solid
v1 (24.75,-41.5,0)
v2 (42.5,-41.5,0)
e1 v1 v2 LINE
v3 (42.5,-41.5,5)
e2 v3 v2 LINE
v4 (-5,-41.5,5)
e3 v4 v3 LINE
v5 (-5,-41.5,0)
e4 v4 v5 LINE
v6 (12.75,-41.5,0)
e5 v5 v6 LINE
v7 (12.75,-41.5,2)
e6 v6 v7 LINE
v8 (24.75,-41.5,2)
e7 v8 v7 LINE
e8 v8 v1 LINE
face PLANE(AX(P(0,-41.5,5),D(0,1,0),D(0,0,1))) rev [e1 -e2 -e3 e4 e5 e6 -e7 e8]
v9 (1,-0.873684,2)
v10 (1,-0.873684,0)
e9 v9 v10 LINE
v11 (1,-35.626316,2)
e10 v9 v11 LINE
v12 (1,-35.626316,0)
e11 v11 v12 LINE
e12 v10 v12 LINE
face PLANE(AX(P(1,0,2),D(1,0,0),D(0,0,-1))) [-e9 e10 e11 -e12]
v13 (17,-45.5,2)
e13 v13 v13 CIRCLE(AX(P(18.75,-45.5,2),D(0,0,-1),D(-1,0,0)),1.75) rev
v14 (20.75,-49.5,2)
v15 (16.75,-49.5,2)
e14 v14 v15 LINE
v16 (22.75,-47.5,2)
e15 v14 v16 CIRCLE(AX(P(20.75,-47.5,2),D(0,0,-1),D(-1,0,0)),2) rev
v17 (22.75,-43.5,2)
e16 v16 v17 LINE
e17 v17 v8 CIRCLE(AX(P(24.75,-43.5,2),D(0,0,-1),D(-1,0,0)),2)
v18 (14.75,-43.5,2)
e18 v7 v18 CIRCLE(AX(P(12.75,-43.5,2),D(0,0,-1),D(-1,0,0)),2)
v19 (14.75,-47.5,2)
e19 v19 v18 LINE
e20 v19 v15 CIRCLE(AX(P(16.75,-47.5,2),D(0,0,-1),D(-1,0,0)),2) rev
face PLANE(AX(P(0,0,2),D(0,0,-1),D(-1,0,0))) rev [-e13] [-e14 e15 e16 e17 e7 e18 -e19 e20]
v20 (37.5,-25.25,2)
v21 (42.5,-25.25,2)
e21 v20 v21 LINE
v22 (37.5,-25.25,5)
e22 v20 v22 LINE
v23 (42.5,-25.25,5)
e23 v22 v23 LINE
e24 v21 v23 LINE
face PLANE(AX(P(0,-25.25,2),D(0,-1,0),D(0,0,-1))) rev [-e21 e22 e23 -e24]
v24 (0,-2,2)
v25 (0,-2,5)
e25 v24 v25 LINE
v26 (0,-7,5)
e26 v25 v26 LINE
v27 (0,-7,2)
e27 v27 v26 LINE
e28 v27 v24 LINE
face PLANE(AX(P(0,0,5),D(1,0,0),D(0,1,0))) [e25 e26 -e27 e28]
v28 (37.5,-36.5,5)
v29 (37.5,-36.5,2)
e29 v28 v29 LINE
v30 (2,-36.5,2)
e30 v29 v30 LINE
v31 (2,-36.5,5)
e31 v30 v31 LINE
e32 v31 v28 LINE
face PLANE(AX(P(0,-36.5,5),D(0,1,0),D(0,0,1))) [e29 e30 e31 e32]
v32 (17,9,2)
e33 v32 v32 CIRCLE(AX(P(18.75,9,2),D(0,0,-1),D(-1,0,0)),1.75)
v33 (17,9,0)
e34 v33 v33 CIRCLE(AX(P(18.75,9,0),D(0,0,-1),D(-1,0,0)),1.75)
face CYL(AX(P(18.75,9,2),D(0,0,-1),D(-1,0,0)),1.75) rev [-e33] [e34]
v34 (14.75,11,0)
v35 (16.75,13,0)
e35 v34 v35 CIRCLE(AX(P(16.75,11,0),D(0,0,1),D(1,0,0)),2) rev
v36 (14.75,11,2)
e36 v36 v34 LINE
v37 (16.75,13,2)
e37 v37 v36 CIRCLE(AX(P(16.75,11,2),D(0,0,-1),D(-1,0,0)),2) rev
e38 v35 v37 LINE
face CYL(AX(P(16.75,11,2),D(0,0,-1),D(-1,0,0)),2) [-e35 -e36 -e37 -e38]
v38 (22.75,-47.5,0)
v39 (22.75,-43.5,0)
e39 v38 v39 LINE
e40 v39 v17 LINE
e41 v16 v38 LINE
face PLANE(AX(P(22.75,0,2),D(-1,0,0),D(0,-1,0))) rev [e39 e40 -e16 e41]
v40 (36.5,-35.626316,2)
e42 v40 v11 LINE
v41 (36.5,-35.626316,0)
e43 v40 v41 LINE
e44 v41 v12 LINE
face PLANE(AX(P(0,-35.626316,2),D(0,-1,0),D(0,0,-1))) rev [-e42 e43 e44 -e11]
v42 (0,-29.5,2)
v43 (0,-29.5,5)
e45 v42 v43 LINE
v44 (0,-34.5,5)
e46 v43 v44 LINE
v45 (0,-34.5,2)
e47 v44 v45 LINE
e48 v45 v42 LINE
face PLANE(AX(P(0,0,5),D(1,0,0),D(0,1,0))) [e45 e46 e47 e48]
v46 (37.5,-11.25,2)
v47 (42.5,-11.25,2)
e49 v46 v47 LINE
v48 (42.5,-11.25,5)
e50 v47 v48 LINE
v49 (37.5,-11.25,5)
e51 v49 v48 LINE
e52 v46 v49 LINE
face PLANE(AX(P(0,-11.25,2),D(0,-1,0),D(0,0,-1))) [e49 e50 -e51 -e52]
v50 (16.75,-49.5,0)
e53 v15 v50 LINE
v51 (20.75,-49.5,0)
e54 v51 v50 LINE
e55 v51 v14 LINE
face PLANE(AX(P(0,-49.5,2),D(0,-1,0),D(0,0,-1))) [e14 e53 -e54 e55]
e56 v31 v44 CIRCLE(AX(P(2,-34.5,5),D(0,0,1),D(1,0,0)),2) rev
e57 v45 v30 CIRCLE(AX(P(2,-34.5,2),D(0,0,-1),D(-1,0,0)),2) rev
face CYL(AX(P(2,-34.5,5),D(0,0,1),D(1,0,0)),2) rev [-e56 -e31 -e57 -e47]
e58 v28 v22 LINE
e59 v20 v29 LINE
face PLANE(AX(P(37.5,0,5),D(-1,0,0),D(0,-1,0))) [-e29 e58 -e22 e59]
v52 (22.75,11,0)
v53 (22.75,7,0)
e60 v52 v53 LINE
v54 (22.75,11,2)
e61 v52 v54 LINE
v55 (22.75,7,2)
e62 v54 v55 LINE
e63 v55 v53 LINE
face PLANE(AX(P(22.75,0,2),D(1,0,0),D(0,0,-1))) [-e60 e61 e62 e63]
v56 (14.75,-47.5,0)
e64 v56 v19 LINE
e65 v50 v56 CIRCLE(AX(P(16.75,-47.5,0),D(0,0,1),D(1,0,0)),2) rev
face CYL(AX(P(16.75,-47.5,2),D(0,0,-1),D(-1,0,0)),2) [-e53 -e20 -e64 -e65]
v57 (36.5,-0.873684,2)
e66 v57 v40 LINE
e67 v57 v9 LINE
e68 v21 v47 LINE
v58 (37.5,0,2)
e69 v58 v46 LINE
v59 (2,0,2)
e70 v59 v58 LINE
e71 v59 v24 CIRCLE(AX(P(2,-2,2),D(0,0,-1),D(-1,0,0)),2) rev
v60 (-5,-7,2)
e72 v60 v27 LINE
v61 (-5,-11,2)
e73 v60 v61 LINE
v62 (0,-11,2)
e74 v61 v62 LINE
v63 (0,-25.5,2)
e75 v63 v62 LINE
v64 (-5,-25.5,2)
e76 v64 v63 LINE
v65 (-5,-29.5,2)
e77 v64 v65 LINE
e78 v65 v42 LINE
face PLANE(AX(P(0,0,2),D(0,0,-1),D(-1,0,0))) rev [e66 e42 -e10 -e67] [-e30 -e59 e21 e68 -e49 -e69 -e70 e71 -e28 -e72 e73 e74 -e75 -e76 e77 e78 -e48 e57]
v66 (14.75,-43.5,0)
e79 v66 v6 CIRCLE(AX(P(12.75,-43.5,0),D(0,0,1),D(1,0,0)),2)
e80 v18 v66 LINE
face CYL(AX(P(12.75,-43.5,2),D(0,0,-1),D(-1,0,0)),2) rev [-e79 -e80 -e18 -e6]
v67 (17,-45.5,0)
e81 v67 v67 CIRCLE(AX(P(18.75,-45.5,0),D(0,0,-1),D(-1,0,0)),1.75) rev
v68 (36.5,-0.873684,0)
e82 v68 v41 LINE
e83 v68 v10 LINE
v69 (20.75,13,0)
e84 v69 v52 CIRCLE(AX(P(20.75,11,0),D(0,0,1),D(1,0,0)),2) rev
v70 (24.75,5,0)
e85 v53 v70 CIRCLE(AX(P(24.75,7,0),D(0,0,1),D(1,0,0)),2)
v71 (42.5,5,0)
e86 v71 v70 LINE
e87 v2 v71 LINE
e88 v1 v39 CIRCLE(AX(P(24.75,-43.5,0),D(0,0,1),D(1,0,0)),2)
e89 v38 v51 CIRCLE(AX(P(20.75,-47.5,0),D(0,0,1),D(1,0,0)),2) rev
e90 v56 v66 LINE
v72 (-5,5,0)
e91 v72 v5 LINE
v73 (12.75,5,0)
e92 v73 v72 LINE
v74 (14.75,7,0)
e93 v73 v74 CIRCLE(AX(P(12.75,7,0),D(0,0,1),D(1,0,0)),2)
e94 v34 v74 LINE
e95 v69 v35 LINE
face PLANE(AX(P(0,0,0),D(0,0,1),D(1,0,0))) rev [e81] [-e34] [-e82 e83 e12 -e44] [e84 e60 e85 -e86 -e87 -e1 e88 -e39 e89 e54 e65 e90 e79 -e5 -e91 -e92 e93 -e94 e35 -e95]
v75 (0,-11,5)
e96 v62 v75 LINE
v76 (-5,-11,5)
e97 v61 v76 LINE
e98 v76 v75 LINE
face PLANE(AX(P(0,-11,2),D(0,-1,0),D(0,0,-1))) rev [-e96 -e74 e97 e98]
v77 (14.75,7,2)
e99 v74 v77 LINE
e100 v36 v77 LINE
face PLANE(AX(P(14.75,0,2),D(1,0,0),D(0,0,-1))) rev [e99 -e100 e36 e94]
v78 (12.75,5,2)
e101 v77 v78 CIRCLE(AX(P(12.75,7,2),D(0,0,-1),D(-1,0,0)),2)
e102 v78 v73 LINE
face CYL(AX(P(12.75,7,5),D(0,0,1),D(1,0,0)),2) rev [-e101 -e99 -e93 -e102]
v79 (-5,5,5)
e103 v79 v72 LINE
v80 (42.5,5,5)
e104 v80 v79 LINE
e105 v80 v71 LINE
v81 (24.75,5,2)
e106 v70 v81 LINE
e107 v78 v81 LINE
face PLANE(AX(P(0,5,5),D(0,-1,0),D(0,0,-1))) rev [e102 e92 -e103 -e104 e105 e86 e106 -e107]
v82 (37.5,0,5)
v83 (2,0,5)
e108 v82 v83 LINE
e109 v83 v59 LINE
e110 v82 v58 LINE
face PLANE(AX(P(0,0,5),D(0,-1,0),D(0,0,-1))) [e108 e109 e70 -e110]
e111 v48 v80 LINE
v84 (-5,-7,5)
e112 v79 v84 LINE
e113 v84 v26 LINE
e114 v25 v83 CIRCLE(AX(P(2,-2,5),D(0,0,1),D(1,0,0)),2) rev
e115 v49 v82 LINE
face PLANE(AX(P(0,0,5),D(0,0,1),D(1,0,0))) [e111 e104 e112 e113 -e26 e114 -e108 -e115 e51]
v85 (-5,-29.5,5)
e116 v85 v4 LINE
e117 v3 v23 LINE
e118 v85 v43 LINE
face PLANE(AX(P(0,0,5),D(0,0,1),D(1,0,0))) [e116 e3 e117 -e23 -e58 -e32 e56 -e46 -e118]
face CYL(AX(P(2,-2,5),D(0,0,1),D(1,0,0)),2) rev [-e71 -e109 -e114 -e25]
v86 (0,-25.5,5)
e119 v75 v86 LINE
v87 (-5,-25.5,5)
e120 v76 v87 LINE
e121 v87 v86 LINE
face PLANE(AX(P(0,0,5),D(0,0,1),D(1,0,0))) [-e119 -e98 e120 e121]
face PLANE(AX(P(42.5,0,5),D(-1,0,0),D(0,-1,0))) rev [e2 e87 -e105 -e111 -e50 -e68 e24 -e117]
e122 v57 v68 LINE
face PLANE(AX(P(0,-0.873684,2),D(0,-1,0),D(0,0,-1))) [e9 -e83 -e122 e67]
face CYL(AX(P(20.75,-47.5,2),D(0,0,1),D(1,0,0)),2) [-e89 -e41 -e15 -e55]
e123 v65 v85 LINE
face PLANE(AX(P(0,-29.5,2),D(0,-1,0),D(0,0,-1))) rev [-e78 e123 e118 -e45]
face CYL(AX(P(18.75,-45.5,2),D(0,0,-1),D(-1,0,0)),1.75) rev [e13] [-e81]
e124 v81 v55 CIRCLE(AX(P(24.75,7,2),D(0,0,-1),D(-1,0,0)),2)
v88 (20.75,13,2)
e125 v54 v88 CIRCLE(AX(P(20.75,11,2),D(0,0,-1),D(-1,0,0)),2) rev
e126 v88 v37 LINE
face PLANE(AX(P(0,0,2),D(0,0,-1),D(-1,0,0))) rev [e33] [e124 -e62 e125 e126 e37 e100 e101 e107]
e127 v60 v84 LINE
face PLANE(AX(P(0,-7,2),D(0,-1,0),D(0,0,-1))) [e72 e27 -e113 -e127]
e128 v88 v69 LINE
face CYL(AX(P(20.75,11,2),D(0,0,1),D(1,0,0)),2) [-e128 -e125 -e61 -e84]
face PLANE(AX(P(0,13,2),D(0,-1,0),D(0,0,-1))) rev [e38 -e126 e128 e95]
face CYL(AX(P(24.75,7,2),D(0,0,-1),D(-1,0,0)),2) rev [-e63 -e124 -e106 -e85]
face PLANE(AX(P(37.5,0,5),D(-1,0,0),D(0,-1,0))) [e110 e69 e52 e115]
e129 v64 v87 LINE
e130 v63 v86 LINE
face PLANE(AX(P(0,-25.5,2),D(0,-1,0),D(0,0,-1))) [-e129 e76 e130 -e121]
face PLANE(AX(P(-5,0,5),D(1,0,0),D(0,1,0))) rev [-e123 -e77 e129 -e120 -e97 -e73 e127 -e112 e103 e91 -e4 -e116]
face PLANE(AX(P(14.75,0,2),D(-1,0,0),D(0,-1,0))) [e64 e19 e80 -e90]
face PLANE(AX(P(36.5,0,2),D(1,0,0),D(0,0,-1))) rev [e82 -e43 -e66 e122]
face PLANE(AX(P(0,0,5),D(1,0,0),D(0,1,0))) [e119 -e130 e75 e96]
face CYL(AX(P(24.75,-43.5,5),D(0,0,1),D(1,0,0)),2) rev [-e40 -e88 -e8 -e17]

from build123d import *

# Parameters (mm, degrees)
SKETCH1_W                 = 37.5
SKETCH1_H                 = 36.5
BOSS_EXTRUDE1_DEPTH       = 5
SHELL1_T                  = 5
BOSS_EXTRUDE2_START       = -2
BOSS_EXTRUDE2_OUTLINE_W   = 8
BOSS_EXTRUDE2_OUTLINE_H   = 8
BOSS_EXTRUDE2_OUTLINE_R   = 1.75
BOSS_EXTRUDE2_OUTLINE_W_2 = 37.5
BOSS_EXTRUDE2_OUTLINE_H_2 = 36.5
BOSS_EXTRUDE2_OUTLINE_W_3 = 35.5
BOSS_EXTRUDE2_OUTLINE_H_3 = 34.752631578
BOSS_EXTRUDE2_DEPTH       = 2
SKETCH3_W                 = 5
SKETCH3_H                 = 4
SKETCH3_H_2               = 14
CUT_EXTRUDE2_DEPTH        = 3
FILLET1_R                 = 2


# Read off the part's stored shape, not the designer's step: Boss-Extrude2
with BuildPart() as part:
    # Sketch1 → Boss-Extrude1 (new body)
    with BuildSketch(Plane.XY):
        with Locations((18.75, -18.25)):
            Rectangle(SKETCH1_W, SKETCH1_H)
    extrude(amount=BOSS_EXTRUDE1_DEPTH)

    # Shell1
    shell1_openings = [part.faces().sort_by_distance(p)[0] for p in [
        (18.75, -18.25, 0),
        (18.75, -18.25, 5),
    ]]
    offset(amount=SHELL1_T, openings=shell1_openings, kind=Kind.INTERSECTION)

    # Boss-Extrude2 outline → Boss-Extrude2 (add)
    # profile 1 of 3: a face of its own
    with BuildSketch(Plane(origin=(0, 0, 0), x_dir=(-1, 0, 0), z_dir=(0, 0, -1)).offset(BOSS_EXTRUDE2_START)):
        with Locations((-18.75, 9)):
            Rectangle(BOSS_EXTRUDE2_OUTLINE_W, BOSS_EXTRUDE2_OUTLINE_H)
        with Locations((-18.75, 9)):
            Circle(BOSS_EXTRUDE2_OUTLINE_R, mode=Mode.SUBTRACT)
    # profile 2 of 3: a face of its own
    with BuildSketch(Plane(origin=(0, 0, 0), x_dir=(-1, 0, 0), z_dir=(0, 0, -1)).offset(BOSS_EXTRUDE2_START)):
        with Locations((-18.75, -45.5)):
            Rectangle(BOSS_EXTRUDE2_OUTLINE_W, BOSS_EXTRUDE2_OUTLINE_H)
        with Locations((-18.75, -45.5)):
            Circle(BOSS_EXTRUDE2_OUTLINE_R, mode=Mode.SUBTRACT)
    # profile 3 of 3: a face of its own
    with BuildSketch(Plane(origin=(0, 0, 0), x_dir=(-1, 0, 0), z_dir=(0, 0, -1)).offset(BOSS_EXTRUDE2_START)):
        with Locations((-18.75, -18.25)):
            Rectangle(BOSS_EXTRUDE2_OUTLINE_W_2, BOSS_EXTRUDE2_OUTLINE_H_2)
        with Locations((-18.75, -18.25)):
            Rectangle(BOSS_EXTRUDE2_OUTLINE_W_3, BOSS_EXTRUDE2_OUTLINE_H_3, mode=Mode.SUBTRACT)
    extrude(amount=BOSS_EXTRUDE2_DEPTH)

    # Sketch3 → Cut-Extrude2 (cut)
    with BuildSketch(Plane.XY.offset(5)):
        with Locations((-2.5, -9)):
            Rectangle(SKETCH3_W, SKETCH3_H)
        with Locations((-2.5, -27.5)):
            Rectangle(SKETCH3_W, SKETCH3_H)
        with Locations((40, -18.25)):
            Rectangle(SKETCH3_W, SKETCH3_H_2)
    extrude(amount=-CUT_EXTRUDE2_DEPTH, mode=Mode.SUBTRACT)

    # Fillet1
    fillet1_edges = [part.edges().sort_by_distance(p)[0] for p in [
        (0, 0, 3.5),
        (0, -36.5, 3.5),
        (22.75, -41.5, 1),
        (22.75, 5, 1),
        (22.75, 13, 1),
        (14.75, 13, 1),
        (14.75, 5, 1),
        (14.75, -41.5, 1),
        (14.75, -49.5, 1),
        (22.75, -49.5, 1),
    ]]
    fillet(fillet1_edges, radius=FILLET1_R)


solid = part.part
